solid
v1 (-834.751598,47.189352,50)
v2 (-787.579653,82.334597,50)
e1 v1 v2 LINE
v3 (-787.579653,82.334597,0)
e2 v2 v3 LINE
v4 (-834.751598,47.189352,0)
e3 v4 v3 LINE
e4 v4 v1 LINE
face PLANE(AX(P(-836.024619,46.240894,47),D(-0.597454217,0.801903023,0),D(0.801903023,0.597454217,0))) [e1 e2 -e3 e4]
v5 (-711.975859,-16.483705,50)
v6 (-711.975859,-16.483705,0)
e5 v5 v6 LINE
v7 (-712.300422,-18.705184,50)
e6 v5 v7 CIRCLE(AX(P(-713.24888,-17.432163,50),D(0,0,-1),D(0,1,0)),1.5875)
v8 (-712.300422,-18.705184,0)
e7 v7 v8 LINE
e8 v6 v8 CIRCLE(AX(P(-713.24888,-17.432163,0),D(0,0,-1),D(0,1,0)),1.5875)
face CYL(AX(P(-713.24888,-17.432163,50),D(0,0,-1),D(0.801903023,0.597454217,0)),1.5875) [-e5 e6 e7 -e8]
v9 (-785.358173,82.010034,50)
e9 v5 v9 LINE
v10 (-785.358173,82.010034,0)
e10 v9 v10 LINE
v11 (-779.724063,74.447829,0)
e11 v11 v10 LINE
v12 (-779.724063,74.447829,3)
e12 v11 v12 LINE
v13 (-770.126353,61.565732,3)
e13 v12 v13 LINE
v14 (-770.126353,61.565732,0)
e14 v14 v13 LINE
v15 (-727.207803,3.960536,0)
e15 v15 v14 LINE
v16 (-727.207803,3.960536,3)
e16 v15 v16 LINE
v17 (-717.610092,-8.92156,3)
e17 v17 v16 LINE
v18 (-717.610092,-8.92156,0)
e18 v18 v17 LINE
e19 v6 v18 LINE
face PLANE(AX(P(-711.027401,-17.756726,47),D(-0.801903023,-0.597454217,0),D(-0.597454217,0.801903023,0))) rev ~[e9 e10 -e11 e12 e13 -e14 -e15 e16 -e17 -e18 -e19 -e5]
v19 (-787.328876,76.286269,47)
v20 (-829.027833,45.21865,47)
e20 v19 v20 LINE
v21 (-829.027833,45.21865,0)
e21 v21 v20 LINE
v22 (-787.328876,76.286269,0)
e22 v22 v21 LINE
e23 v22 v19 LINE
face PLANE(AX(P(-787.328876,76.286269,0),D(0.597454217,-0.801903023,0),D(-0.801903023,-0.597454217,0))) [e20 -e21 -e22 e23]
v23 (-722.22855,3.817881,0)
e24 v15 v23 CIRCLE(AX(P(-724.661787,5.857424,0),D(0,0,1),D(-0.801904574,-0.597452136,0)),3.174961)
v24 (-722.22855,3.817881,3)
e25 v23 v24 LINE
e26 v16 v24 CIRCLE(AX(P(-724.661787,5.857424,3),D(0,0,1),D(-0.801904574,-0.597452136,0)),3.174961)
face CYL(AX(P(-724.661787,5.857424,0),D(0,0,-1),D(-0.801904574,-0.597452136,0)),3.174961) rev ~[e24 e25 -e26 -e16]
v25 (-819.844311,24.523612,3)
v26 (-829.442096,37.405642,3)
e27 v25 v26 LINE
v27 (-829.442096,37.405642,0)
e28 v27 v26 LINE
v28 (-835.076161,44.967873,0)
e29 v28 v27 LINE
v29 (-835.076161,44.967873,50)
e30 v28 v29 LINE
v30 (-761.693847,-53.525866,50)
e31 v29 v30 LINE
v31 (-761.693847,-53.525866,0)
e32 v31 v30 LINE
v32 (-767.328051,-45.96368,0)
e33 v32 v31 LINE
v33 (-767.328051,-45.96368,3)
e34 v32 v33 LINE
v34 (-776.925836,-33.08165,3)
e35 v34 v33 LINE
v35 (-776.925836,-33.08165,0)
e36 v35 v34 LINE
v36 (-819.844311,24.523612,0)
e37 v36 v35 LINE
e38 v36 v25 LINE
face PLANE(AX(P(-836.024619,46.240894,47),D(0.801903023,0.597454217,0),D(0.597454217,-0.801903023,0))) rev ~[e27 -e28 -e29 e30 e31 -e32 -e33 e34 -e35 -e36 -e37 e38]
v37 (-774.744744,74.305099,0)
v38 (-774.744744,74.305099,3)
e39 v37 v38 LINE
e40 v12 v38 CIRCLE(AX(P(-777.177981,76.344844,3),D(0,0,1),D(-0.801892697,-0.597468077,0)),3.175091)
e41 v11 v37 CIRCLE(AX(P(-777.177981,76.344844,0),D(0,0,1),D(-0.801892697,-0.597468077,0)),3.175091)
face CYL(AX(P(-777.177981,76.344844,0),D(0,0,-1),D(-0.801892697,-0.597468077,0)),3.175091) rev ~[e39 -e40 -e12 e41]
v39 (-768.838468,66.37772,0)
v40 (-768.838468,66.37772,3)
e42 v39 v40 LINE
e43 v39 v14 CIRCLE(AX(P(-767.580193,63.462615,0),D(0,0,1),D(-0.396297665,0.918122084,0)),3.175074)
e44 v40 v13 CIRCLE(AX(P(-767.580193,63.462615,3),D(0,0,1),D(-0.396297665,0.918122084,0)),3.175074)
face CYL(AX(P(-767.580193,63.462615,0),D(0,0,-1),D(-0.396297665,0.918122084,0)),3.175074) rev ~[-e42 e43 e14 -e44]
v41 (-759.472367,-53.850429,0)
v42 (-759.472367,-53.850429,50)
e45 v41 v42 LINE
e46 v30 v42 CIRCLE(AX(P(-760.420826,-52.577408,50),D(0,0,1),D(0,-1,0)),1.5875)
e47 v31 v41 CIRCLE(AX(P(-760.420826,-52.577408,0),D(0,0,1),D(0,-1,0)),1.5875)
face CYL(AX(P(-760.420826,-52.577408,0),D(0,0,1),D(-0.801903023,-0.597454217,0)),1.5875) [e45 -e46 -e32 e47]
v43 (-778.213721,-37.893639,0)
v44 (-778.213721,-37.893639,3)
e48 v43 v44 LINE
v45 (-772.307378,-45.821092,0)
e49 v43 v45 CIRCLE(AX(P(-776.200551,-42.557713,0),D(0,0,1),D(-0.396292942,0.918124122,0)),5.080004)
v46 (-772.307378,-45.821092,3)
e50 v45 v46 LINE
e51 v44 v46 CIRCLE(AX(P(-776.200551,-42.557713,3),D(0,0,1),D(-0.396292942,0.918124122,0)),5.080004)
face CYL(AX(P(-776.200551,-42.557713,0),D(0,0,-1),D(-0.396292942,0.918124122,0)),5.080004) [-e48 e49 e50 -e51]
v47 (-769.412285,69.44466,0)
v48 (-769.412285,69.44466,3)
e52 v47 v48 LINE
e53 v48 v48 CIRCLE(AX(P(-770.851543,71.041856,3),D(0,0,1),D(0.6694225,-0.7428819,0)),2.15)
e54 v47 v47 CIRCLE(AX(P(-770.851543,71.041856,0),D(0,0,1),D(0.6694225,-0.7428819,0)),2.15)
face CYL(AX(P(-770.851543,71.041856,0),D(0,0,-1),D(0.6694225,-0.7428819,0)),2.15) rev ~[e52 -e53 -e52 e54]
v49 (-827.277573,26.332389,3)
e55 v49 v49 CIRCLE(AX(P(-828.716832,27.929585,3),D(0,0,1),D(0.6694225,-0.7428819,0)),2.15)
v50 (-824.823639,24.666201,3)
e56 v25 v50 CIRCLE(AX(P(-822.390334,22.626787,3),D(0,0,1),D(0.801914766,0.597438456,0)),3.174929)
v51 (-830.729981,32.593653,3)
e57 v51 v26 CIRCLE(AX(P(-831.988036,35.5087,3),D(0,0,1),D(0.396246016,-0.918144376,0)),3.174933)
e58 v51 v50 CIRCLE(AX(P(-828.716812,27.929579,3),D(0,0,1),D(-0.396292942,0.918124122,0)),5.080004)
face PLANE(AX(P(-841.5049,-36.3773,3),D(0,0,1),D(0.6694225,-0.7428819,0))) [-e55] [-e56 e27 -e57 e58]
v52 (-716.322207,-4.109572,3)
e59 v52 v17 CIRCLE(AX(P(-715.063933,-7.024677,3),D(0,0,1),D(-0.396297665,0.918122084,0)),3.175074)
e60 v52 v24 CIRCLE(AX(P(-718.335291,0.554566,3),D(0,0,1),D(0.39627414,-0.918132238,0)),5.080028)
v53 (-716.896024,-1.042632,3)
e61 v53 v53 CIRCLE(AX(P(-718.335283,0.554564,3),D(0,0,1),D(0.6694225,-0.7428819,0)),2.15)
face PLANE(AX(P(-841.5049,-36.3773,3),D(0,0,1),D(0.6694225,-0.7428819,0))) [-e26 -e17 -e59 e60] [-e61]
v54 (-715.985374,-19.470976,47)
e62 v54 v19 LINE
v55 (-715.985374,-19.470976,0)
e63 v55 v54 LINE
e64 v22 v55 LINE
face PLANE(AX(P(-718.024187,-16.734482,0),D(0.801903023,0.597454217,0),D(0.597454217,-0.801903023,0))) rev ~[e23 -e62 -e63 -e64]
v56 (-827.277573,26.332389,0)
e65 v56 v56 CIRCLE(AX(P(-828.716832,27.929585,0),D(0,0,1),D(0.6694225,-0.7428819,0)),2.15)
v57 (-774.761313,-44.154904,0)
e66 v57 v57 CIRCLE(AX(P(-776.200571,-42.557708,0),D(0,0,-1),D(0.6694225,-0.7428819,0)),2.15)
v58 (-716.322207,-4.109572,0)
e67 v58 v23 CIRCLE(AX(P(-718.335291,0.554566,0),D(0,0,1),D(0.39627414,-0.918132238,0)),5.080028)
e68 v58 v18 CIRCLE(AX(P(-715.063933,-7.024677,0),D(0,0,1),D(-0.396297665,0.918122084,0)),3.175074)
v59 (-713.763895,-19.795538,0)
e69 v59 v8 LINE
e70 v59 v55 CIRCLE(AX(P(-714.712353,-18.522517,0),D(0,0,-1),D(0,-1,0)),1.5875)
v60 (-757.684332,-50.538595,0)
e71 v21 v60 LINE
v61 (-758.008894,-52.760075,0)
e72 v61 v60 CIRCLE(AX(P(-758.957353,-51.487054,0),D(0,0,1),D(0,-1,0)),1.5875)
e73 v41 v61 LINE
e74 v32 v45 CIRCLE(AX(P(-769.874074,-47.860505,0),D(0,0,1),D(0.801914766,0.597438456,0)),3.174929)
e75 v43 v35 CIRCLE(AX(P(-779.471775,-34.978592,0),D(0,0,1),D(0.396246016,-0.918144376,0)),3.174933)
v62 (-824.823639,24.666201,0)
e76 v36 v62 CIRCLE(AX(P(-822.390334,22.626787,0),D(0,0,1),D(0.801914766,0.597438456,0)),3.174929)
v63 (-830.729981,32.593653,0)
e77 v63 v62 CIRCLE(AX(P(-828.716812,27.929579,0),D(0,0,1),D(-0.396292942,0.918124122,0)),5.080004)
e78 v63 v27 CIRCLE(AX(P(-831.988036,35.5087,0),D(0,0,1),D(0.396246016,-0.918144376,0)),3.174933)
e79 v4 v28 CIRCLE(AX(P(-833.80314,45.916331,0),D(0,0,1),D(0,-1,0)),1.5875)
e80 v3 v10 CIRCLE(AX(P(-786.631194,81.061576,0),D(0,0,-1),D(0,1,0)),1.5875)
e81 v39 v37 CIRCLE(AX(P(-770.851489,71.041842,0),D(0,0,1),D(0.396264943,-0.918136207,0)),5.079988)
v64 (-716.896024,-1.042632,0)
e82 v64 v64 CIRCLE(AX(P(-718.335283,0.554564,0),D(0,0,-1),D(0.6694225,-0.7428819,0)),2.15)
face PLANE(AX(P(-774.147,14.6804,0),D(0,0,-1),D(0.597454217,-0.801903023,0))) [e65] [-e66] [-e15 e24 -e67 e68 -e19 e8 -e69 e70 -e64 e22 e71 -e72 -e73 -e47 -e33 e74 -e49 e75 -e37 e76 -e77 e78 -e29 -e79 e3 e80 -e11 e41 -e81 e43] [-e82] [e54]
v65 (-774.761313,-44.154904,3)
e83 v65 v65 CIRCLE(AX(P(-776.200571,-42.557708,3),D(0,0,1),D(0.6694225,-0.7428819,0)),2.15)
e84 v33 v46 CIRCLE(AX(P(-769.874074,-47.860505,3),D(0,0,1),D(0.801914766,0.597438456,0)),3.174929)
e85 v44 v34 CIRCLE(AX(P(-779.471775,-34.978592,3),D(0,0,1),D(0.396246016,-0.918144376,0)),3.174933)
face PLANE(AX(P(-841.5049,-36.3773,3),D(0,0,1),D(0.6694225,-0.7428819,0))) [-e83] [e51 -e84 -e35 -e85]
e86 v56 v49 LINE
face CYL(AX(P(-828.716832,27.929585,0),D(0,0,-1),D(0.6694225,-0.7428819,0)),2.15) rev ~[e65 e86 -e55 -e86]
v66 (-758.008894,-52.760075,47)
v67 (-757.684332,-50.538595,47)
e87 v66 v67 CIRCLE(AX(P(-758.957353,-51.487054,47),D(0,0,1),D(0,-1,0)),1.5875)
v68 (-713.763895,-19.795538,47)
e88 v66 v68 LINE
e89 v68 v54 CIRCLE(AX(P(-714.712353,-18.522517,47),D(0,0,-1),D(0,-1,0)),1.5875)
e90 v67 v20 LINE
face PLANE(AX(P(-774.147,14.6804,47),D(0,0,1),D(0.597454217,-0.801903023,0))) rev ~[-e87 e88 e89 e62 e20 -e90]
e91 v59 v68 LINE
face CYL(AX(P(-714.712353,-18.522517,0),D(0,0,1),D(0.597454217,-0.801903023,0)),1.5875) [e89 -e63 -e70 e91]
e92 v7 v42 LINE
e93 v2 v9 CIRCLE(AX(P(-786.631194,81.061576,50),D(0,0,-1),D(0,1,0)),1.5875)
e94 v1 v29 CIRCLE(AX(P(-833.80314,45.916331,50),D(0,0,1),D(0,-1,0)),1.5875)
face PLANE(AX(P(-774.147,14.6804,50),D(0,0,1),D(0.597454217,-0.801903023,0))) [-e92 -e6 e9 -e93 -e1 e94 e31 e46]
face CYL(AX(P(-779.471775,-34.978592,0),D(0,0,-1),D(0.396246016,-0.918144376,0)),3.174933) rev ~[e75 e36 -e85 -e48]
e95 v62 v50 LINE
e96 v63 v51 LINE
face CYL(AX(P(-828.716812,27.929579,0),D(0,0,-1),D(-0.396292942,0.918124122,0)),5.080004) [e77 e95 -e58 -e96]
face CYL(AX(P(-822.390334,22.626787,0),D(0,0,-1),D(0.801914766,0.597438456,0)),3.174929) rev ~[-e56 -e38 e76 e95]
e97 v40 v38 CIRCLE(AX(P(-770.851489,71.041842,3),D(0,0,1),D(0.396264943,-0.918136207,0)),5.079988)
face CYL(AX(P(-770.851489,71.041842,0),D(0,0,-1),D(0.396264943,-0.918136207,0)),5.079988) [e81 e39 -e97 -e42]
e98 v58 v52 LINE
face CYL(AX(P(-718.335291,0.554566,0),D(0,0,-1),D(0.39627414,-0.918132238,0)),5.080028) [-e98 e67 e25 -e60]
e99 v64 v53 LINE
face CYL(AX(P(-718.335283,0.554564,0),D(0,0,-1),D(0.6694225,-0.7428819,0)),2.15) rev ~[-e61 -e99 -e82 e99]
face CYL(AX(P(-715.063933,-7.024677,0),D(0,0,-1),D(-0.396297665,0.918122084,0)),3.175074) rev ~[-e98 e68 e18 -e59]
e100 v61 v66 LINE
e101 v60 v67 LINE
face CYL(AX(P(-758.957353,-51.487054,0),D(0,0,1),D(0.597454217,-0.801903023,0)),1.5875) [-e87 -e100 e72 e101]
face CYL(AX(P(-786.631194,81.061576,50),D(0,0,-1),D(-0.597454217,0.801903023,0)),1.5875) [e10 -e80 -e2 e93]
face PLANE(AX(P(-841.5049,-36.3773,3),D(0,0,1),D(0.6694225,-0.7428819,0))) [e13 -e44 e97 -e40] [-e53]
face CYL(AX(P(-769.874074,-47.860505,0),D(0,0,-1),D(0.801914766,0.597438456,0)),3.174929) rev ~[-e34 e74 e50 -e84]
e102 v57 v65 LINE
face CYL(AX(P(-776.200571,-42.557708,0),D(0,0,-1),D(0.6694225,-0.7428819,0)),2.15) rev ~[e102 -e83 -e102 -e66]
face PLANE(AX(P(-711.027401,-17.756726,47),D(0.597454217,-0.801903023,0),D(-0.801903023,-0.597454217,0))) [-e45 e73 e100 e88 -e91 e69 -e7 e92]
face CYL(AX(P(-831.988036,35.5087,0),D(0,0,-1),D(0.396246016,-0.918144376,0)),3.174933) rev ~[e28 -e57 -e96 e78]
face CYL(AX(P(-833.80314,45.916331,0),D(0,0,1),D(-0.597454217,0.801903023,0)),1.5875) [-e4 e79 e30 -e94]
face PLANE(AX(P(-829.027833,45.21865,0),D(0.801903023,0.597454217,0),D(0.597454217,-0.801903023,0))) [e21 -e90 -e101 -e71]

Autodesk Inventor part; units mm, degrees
ref_plane "YZ Plane" through (0, 0, 0) normal (1, 0, 0) x (0, 1, 0)
ref_plane "XZ Plane" through (0, 0, 0) normal (0, 1, 0) x (-1, 0, 0)
ref_plane "XY Plane" through (0, 0, 0) normal (0, 0, 1) x (1, 0, 0)
ref_plane "Work Plane1" through (-774.147, 14.6804, 0) normal (0, 0, -1) x (0.5974542, -0.801903, 0)
sketch "Sketch1" plane through (-774.147, 14.6804, 0) normal (0, 0, -1) x (0.5974542, -0.801903, 0)
  line L0 (58.7225, -26.2361) -> (-57.2775, -26.2361)
  line L1 (-57.2775, -26.2361) -> (-57.2775, 25.7639)
  line L2 (-57.2775, 25.7639) -> (58.7225, 25.7639)
  line L3 (58.7225, 25.7639) -> (58.7225, -26.2361)
  arc A0 (19.6988, -21.7639) -> (2.3103, -21.7639) centre (11.0046, -62.2541) ccw construction
  arc A1 (19.6988, -21.7639) -> (24.3194, -21.7639) centre (22.0091, -11.0045) ccw construction
  arc A2 (41.7079, -21.7639) -> (24.3194, -21.7639) centre (33.0137, -62.2541) ccw construction
  arc A3 (41.7079, -21.7639) -> (54.7775, -8.6943) centre (44.0182, -11.0045) ccw construction
  arc A4 (54.7775, 8.6943) -> (54.7775, -8.6943) centre (95.2678, 0) ccw construction
  arc A5 (54.7775, 8.6943) -> (41.7079, 21.7639) centre (44.0182, 11.0046) ccw construction
  arc A6 (24.3194, 21.7639) -> (41.7079, 21.7639) centre (33.0137, 62.2541) ccw construction
  arc A7 (24.3194, 21.7639) -> (19.6988, 21.7639) centre (22.0091, 11.0046) ccw construction
  arc A8 (2.3103, 21.7639) -> (19.6988, 21.7639) centre (11.0046, 62.2541) ccw construction
  arc A9 (2.3103, 21.7639) -> (-2.3103, 21.7639) centre (0, 11.0046) ccw construction
  arc A10 (-19.6988, 21.7639) -> (-2.3103, 21.7639) centre (-11.0045, 62.2541) ccw construction
  arc A11 (-19.6988, 21.7639) -> (-24.3194, 21.7639) centre (-22.0091, 11.0046) ccw construction
  arc A12 (-41.7079, 21.7639) -> (-24.3194, 21.7639) centre (-33.0136, 62.2541) ccw construction
  arc A13 (-41.7079, 21.7639) -> (-54.7775, 8.6943) centre (-44.0182, 11.0046) ccw construction
  arc A14 (-54.7775, -8.6943) -> (-54.7775, 8.6943) centre (-95.2678, 0) ccw construction
  arc A15 (-54.7775, -8.6943) -> (-41.7079, -21.7639) centre (-44.0182, -11.0045) ccw construction
  arc A16 (-24.3194, -21.7639) -> (-41.7079, -21.7639) centre (-33.0136, -62.2541) ccw construction
  arc A17 (-24.3194, -21.7639) -> (-19.6988, -21.7639) centre (-22.0091, -11.0045) ccw construction
  arc A18 (-2.3103, -21.7639) -> (-19.6988, -21.7639) centre (-11.0045, -62.2541) ccw construction
  arc A19 (-2.3103, -21.7639) -> (2.3103, -21.7639) centre (0, -11.0045) ccw construction
  line L4 (159.874, 0.748) -> (161.144, 0.748) construction
  line L5 (161.144, 0.748) -> (161.144, -3.697) construction
  line L6 (159.874, -3.697) -> (161.144, -3.697) construction
  line L7 (159.874, -3.697) -> (159.874, 0.748) construction
  line L8 (63.7225, -31.2361) -> (-62.2775, -31.2361)
  line L9 (-62.2775, -31.2361) -> (-62.2775, 30.7639)
  line L10 (-62.2775, 30.7639) -> (63.7225, 30.7639)
  line L11 (63.7225, 30.7639) -> (63.7225, -31.2361)
  line L12 (58.7225, -26.2361) -> (63.7225, -26.2361)
  line L13 (-57.2775, -26.2361) -> (-62.2775, -26.2361)
  line L14 (-57.2775, 25.7639) -> (-62.2775, 25.7639)
  line L15 (58.7225, 25.7639) -> (63.7225, 25.7639)
  point P0 (474.2897, -612.02)
  dimension "d0" = 116
  dimension "d1" = 52
  dimension "d2" = 2.5
  dimension "d3" = 4
  dimension "d4" = 5
extrude "Extrusion1" add sketch "Sketch1" against normal blind 47 contours L12 L11 L8 L9 L13 L0 | L13 L9 L14 L1 | L2 L14 L9 L10 L11 L15
sketch "Sketch2" plane through (-774.147, 14.6804, 47) normal (0, 0, 1) x (0.5974542, -0.801903, 0)
  line L0 (-62.2775, -30.7639) -> (63.7225, -30.7639) projected
  line L1 (63.7225, 31.2361) -> (-62.2775, 31.2361) projected
  line L2 (63.7225, -30.7639) -> (-62.2775, -30.7639)
  line L3 (-62.2775, -30.7639) -> (-62.2775, 31.2361)
  line L4 (-62.2775, 31.2361) -> (63.7225, 31.2361)
  line L5 (63.7225, 31.2361) -> (63.7225, -30.7639)
  point P0 (474.2897, 612.02)
  point P1 (-62.2775, -30.7639)
  point P2 (63.7225, 31.2361)
extrude "Extrusion2" add sketch "Sketch2" along normal blind 3
fillet "Fillet1" radius 1.5875 6 edges at (-711.0274, -17.7567, 25) (-786.3067, 83.283, 25) (-760.7454, -54.7989, 25) (-756.7359, -51.8116, 23.5) (-715.037, -20.744, 23.5) (-836.0247, 46.2409, 25)
ref_plane "Work Plane2" through (-841.5049, -36.3773, 0) normal (0, 0, 1) x (0.6694225, -0.7428819, 0)
sketch "Sketch3" plane through (-841.5049, -36.3773, 0) normal (0, 0, 1) x (0.6694225, -0.7428819, 0)
  line L0 (-50.362, 120.9615) -> (71.931, 109.5419) projected
  line L1 (66.1667, 47.8105) -> (-56.1263, 59.23) projected
  line L2 (73.3641, 107.8137) -> (73.1944, 105.9966) projected
  line L3 (-57.5594, 60.9582) -> (-52.0902, 119.5284) projected
  circle A0 centre (-39.2118, 52.5485) radius 2.15
  circle A1 centre (48.3075, 44.3761) radius 2.15
  line L4 (68.0646, 51.0606) -> (67.8949, 49.2435) projected
  arc A2 (-44.0243, 54.1752) -> (-34.1813, 53.2561) centre (-39.2118, 52.5485) ccw
  line L5 (40.7824, 50.1808) -> (48.7798, 49.434)
  arc A3 (-44.0243, 54.1752) -> (-46.7369, 58.3532) centre (-47.0321, 55.192) ccw
  arc A4 (-30.7421, 56.8597) -> (-34.1813, 53.2561) centre (-31.0373, 53.6984) ccw
  arc A5 (43.495, 46.0028) -> (53.338, 45.0837) centre (48.3075, 44.3761) ccw
  arc A6 (43.495, 46.0028) -> (40.7824, 50.1808) centre (40.4872, 47.0196) ccw
  arc A7 (43.495, 46.0028) -> (40.7824, 50.1808) centre (40.4872, 47.0196) ccw
  line L6 (66.1667, 47.8105) -> (40.7824, 50.1808)
  arc A8 (43.495, 46.0028) -> (40.7824, 50.1808) centre (40.4872, 47.0196) ccw
  line L7 (48.3075, 44.3761) -> (48.6282, 47.8105)
  arc A9 (56.7772, 48.6873) -> (53.338, 45.0837) centre (56.482, 45.526) ccw
  line L8 (-54.8248, 90.2433) -> (-8.2036, 85.8899) construction
  line L9 (71.931, 109.5419) -> (-50.362, 120.9615)
  circle A10 centre (-32.5028, 124.3959) radius 2.15
  circle A11 centre (55.0165, 116.2235) radius 2.15
  line L10 (73.1944, 105.9966) -> (73.3641, 107.8137)
  arc A12 (-27.6903, 122.7691) -> (-37.5332, 123.6882) centre (-32.5028, 124.3959) ccw
  line L11 (46.5468, 111.9123) -> (54.5442, 111.1655)
  arc A13 (-40.9725, 120.0847) -> (-37.5332, 123.6882) centre (-40.6773, 123.2459) ccw
  arc A14 (-27.6903, 122.7691) -> (-24.9777, 118.5911) centre (-24.6825, 121.7524) ccw
  arc A15 (59.829, 114.5967) -> (49.986, 115.5158) centre (55.0165, 116.2235) ccw
  arc A16 (46.5468, 111.9123) -> (49.986, 115.5158) centre (46.842, 115.0735) ccw
  arc A17 (46.5468, 111.9123) -> (49.986, 115.5158) centre (46.842, 115.0735) ccw
  line L12 (71.931, 109.5419) -> (46.5468, 111.9123)
  arc A18 (46.5468, 111.9123) -> (49.986, 115.5158) centre (46.842, 115.0735) ccw
  line L13 (55.0165, 116.2235) -> (54.6958, 112.7891)
  arc A19 (59.829, 114.5967) -> (62.5416, 110.4187) centre (62.8368, 113.58) ccw
  point P0 (536.2982, 649.4905)
  point P1 (73.2792, 106.9052)
  point P2 (48.7798, 49.434)
  point P3 (54.5442, 111.1655)
  point P4 (-40.9725, 120.0847)
  point P5 (-24.9777, 118.5911)
  point P6 (49.986, 115.5158)
  point P7 (46.5468, 111.9123)
  point P8 (62.5416, 110.4187)
  point P9 (43.495, 46.0028)
  point P10 (56.7772, 48.6873)
  point P11 (40.7824, 50.1808)
  point P12 (-30.7421, 56.8597)
  point P13 (-46.7369, 58.3532)
  dimension "d16" = 4.3
  dimension "d18" = 4.3
  dimension "d20" = 19.05
  dimension "d21" = 19.05
  dimension "d24" = 5.08
  dimension "d25" = 3.175
  dimension "d26" = 3.175
  dimension "d27" = 3.175
  dimension "d28" = 5.08
  dimension "d29" = 3.175
  dimension "d30" = 3.175
extrude "Extrusion3" add sketch "Sketch3" along normal blind 3
properties part number "Battery_Holder"
